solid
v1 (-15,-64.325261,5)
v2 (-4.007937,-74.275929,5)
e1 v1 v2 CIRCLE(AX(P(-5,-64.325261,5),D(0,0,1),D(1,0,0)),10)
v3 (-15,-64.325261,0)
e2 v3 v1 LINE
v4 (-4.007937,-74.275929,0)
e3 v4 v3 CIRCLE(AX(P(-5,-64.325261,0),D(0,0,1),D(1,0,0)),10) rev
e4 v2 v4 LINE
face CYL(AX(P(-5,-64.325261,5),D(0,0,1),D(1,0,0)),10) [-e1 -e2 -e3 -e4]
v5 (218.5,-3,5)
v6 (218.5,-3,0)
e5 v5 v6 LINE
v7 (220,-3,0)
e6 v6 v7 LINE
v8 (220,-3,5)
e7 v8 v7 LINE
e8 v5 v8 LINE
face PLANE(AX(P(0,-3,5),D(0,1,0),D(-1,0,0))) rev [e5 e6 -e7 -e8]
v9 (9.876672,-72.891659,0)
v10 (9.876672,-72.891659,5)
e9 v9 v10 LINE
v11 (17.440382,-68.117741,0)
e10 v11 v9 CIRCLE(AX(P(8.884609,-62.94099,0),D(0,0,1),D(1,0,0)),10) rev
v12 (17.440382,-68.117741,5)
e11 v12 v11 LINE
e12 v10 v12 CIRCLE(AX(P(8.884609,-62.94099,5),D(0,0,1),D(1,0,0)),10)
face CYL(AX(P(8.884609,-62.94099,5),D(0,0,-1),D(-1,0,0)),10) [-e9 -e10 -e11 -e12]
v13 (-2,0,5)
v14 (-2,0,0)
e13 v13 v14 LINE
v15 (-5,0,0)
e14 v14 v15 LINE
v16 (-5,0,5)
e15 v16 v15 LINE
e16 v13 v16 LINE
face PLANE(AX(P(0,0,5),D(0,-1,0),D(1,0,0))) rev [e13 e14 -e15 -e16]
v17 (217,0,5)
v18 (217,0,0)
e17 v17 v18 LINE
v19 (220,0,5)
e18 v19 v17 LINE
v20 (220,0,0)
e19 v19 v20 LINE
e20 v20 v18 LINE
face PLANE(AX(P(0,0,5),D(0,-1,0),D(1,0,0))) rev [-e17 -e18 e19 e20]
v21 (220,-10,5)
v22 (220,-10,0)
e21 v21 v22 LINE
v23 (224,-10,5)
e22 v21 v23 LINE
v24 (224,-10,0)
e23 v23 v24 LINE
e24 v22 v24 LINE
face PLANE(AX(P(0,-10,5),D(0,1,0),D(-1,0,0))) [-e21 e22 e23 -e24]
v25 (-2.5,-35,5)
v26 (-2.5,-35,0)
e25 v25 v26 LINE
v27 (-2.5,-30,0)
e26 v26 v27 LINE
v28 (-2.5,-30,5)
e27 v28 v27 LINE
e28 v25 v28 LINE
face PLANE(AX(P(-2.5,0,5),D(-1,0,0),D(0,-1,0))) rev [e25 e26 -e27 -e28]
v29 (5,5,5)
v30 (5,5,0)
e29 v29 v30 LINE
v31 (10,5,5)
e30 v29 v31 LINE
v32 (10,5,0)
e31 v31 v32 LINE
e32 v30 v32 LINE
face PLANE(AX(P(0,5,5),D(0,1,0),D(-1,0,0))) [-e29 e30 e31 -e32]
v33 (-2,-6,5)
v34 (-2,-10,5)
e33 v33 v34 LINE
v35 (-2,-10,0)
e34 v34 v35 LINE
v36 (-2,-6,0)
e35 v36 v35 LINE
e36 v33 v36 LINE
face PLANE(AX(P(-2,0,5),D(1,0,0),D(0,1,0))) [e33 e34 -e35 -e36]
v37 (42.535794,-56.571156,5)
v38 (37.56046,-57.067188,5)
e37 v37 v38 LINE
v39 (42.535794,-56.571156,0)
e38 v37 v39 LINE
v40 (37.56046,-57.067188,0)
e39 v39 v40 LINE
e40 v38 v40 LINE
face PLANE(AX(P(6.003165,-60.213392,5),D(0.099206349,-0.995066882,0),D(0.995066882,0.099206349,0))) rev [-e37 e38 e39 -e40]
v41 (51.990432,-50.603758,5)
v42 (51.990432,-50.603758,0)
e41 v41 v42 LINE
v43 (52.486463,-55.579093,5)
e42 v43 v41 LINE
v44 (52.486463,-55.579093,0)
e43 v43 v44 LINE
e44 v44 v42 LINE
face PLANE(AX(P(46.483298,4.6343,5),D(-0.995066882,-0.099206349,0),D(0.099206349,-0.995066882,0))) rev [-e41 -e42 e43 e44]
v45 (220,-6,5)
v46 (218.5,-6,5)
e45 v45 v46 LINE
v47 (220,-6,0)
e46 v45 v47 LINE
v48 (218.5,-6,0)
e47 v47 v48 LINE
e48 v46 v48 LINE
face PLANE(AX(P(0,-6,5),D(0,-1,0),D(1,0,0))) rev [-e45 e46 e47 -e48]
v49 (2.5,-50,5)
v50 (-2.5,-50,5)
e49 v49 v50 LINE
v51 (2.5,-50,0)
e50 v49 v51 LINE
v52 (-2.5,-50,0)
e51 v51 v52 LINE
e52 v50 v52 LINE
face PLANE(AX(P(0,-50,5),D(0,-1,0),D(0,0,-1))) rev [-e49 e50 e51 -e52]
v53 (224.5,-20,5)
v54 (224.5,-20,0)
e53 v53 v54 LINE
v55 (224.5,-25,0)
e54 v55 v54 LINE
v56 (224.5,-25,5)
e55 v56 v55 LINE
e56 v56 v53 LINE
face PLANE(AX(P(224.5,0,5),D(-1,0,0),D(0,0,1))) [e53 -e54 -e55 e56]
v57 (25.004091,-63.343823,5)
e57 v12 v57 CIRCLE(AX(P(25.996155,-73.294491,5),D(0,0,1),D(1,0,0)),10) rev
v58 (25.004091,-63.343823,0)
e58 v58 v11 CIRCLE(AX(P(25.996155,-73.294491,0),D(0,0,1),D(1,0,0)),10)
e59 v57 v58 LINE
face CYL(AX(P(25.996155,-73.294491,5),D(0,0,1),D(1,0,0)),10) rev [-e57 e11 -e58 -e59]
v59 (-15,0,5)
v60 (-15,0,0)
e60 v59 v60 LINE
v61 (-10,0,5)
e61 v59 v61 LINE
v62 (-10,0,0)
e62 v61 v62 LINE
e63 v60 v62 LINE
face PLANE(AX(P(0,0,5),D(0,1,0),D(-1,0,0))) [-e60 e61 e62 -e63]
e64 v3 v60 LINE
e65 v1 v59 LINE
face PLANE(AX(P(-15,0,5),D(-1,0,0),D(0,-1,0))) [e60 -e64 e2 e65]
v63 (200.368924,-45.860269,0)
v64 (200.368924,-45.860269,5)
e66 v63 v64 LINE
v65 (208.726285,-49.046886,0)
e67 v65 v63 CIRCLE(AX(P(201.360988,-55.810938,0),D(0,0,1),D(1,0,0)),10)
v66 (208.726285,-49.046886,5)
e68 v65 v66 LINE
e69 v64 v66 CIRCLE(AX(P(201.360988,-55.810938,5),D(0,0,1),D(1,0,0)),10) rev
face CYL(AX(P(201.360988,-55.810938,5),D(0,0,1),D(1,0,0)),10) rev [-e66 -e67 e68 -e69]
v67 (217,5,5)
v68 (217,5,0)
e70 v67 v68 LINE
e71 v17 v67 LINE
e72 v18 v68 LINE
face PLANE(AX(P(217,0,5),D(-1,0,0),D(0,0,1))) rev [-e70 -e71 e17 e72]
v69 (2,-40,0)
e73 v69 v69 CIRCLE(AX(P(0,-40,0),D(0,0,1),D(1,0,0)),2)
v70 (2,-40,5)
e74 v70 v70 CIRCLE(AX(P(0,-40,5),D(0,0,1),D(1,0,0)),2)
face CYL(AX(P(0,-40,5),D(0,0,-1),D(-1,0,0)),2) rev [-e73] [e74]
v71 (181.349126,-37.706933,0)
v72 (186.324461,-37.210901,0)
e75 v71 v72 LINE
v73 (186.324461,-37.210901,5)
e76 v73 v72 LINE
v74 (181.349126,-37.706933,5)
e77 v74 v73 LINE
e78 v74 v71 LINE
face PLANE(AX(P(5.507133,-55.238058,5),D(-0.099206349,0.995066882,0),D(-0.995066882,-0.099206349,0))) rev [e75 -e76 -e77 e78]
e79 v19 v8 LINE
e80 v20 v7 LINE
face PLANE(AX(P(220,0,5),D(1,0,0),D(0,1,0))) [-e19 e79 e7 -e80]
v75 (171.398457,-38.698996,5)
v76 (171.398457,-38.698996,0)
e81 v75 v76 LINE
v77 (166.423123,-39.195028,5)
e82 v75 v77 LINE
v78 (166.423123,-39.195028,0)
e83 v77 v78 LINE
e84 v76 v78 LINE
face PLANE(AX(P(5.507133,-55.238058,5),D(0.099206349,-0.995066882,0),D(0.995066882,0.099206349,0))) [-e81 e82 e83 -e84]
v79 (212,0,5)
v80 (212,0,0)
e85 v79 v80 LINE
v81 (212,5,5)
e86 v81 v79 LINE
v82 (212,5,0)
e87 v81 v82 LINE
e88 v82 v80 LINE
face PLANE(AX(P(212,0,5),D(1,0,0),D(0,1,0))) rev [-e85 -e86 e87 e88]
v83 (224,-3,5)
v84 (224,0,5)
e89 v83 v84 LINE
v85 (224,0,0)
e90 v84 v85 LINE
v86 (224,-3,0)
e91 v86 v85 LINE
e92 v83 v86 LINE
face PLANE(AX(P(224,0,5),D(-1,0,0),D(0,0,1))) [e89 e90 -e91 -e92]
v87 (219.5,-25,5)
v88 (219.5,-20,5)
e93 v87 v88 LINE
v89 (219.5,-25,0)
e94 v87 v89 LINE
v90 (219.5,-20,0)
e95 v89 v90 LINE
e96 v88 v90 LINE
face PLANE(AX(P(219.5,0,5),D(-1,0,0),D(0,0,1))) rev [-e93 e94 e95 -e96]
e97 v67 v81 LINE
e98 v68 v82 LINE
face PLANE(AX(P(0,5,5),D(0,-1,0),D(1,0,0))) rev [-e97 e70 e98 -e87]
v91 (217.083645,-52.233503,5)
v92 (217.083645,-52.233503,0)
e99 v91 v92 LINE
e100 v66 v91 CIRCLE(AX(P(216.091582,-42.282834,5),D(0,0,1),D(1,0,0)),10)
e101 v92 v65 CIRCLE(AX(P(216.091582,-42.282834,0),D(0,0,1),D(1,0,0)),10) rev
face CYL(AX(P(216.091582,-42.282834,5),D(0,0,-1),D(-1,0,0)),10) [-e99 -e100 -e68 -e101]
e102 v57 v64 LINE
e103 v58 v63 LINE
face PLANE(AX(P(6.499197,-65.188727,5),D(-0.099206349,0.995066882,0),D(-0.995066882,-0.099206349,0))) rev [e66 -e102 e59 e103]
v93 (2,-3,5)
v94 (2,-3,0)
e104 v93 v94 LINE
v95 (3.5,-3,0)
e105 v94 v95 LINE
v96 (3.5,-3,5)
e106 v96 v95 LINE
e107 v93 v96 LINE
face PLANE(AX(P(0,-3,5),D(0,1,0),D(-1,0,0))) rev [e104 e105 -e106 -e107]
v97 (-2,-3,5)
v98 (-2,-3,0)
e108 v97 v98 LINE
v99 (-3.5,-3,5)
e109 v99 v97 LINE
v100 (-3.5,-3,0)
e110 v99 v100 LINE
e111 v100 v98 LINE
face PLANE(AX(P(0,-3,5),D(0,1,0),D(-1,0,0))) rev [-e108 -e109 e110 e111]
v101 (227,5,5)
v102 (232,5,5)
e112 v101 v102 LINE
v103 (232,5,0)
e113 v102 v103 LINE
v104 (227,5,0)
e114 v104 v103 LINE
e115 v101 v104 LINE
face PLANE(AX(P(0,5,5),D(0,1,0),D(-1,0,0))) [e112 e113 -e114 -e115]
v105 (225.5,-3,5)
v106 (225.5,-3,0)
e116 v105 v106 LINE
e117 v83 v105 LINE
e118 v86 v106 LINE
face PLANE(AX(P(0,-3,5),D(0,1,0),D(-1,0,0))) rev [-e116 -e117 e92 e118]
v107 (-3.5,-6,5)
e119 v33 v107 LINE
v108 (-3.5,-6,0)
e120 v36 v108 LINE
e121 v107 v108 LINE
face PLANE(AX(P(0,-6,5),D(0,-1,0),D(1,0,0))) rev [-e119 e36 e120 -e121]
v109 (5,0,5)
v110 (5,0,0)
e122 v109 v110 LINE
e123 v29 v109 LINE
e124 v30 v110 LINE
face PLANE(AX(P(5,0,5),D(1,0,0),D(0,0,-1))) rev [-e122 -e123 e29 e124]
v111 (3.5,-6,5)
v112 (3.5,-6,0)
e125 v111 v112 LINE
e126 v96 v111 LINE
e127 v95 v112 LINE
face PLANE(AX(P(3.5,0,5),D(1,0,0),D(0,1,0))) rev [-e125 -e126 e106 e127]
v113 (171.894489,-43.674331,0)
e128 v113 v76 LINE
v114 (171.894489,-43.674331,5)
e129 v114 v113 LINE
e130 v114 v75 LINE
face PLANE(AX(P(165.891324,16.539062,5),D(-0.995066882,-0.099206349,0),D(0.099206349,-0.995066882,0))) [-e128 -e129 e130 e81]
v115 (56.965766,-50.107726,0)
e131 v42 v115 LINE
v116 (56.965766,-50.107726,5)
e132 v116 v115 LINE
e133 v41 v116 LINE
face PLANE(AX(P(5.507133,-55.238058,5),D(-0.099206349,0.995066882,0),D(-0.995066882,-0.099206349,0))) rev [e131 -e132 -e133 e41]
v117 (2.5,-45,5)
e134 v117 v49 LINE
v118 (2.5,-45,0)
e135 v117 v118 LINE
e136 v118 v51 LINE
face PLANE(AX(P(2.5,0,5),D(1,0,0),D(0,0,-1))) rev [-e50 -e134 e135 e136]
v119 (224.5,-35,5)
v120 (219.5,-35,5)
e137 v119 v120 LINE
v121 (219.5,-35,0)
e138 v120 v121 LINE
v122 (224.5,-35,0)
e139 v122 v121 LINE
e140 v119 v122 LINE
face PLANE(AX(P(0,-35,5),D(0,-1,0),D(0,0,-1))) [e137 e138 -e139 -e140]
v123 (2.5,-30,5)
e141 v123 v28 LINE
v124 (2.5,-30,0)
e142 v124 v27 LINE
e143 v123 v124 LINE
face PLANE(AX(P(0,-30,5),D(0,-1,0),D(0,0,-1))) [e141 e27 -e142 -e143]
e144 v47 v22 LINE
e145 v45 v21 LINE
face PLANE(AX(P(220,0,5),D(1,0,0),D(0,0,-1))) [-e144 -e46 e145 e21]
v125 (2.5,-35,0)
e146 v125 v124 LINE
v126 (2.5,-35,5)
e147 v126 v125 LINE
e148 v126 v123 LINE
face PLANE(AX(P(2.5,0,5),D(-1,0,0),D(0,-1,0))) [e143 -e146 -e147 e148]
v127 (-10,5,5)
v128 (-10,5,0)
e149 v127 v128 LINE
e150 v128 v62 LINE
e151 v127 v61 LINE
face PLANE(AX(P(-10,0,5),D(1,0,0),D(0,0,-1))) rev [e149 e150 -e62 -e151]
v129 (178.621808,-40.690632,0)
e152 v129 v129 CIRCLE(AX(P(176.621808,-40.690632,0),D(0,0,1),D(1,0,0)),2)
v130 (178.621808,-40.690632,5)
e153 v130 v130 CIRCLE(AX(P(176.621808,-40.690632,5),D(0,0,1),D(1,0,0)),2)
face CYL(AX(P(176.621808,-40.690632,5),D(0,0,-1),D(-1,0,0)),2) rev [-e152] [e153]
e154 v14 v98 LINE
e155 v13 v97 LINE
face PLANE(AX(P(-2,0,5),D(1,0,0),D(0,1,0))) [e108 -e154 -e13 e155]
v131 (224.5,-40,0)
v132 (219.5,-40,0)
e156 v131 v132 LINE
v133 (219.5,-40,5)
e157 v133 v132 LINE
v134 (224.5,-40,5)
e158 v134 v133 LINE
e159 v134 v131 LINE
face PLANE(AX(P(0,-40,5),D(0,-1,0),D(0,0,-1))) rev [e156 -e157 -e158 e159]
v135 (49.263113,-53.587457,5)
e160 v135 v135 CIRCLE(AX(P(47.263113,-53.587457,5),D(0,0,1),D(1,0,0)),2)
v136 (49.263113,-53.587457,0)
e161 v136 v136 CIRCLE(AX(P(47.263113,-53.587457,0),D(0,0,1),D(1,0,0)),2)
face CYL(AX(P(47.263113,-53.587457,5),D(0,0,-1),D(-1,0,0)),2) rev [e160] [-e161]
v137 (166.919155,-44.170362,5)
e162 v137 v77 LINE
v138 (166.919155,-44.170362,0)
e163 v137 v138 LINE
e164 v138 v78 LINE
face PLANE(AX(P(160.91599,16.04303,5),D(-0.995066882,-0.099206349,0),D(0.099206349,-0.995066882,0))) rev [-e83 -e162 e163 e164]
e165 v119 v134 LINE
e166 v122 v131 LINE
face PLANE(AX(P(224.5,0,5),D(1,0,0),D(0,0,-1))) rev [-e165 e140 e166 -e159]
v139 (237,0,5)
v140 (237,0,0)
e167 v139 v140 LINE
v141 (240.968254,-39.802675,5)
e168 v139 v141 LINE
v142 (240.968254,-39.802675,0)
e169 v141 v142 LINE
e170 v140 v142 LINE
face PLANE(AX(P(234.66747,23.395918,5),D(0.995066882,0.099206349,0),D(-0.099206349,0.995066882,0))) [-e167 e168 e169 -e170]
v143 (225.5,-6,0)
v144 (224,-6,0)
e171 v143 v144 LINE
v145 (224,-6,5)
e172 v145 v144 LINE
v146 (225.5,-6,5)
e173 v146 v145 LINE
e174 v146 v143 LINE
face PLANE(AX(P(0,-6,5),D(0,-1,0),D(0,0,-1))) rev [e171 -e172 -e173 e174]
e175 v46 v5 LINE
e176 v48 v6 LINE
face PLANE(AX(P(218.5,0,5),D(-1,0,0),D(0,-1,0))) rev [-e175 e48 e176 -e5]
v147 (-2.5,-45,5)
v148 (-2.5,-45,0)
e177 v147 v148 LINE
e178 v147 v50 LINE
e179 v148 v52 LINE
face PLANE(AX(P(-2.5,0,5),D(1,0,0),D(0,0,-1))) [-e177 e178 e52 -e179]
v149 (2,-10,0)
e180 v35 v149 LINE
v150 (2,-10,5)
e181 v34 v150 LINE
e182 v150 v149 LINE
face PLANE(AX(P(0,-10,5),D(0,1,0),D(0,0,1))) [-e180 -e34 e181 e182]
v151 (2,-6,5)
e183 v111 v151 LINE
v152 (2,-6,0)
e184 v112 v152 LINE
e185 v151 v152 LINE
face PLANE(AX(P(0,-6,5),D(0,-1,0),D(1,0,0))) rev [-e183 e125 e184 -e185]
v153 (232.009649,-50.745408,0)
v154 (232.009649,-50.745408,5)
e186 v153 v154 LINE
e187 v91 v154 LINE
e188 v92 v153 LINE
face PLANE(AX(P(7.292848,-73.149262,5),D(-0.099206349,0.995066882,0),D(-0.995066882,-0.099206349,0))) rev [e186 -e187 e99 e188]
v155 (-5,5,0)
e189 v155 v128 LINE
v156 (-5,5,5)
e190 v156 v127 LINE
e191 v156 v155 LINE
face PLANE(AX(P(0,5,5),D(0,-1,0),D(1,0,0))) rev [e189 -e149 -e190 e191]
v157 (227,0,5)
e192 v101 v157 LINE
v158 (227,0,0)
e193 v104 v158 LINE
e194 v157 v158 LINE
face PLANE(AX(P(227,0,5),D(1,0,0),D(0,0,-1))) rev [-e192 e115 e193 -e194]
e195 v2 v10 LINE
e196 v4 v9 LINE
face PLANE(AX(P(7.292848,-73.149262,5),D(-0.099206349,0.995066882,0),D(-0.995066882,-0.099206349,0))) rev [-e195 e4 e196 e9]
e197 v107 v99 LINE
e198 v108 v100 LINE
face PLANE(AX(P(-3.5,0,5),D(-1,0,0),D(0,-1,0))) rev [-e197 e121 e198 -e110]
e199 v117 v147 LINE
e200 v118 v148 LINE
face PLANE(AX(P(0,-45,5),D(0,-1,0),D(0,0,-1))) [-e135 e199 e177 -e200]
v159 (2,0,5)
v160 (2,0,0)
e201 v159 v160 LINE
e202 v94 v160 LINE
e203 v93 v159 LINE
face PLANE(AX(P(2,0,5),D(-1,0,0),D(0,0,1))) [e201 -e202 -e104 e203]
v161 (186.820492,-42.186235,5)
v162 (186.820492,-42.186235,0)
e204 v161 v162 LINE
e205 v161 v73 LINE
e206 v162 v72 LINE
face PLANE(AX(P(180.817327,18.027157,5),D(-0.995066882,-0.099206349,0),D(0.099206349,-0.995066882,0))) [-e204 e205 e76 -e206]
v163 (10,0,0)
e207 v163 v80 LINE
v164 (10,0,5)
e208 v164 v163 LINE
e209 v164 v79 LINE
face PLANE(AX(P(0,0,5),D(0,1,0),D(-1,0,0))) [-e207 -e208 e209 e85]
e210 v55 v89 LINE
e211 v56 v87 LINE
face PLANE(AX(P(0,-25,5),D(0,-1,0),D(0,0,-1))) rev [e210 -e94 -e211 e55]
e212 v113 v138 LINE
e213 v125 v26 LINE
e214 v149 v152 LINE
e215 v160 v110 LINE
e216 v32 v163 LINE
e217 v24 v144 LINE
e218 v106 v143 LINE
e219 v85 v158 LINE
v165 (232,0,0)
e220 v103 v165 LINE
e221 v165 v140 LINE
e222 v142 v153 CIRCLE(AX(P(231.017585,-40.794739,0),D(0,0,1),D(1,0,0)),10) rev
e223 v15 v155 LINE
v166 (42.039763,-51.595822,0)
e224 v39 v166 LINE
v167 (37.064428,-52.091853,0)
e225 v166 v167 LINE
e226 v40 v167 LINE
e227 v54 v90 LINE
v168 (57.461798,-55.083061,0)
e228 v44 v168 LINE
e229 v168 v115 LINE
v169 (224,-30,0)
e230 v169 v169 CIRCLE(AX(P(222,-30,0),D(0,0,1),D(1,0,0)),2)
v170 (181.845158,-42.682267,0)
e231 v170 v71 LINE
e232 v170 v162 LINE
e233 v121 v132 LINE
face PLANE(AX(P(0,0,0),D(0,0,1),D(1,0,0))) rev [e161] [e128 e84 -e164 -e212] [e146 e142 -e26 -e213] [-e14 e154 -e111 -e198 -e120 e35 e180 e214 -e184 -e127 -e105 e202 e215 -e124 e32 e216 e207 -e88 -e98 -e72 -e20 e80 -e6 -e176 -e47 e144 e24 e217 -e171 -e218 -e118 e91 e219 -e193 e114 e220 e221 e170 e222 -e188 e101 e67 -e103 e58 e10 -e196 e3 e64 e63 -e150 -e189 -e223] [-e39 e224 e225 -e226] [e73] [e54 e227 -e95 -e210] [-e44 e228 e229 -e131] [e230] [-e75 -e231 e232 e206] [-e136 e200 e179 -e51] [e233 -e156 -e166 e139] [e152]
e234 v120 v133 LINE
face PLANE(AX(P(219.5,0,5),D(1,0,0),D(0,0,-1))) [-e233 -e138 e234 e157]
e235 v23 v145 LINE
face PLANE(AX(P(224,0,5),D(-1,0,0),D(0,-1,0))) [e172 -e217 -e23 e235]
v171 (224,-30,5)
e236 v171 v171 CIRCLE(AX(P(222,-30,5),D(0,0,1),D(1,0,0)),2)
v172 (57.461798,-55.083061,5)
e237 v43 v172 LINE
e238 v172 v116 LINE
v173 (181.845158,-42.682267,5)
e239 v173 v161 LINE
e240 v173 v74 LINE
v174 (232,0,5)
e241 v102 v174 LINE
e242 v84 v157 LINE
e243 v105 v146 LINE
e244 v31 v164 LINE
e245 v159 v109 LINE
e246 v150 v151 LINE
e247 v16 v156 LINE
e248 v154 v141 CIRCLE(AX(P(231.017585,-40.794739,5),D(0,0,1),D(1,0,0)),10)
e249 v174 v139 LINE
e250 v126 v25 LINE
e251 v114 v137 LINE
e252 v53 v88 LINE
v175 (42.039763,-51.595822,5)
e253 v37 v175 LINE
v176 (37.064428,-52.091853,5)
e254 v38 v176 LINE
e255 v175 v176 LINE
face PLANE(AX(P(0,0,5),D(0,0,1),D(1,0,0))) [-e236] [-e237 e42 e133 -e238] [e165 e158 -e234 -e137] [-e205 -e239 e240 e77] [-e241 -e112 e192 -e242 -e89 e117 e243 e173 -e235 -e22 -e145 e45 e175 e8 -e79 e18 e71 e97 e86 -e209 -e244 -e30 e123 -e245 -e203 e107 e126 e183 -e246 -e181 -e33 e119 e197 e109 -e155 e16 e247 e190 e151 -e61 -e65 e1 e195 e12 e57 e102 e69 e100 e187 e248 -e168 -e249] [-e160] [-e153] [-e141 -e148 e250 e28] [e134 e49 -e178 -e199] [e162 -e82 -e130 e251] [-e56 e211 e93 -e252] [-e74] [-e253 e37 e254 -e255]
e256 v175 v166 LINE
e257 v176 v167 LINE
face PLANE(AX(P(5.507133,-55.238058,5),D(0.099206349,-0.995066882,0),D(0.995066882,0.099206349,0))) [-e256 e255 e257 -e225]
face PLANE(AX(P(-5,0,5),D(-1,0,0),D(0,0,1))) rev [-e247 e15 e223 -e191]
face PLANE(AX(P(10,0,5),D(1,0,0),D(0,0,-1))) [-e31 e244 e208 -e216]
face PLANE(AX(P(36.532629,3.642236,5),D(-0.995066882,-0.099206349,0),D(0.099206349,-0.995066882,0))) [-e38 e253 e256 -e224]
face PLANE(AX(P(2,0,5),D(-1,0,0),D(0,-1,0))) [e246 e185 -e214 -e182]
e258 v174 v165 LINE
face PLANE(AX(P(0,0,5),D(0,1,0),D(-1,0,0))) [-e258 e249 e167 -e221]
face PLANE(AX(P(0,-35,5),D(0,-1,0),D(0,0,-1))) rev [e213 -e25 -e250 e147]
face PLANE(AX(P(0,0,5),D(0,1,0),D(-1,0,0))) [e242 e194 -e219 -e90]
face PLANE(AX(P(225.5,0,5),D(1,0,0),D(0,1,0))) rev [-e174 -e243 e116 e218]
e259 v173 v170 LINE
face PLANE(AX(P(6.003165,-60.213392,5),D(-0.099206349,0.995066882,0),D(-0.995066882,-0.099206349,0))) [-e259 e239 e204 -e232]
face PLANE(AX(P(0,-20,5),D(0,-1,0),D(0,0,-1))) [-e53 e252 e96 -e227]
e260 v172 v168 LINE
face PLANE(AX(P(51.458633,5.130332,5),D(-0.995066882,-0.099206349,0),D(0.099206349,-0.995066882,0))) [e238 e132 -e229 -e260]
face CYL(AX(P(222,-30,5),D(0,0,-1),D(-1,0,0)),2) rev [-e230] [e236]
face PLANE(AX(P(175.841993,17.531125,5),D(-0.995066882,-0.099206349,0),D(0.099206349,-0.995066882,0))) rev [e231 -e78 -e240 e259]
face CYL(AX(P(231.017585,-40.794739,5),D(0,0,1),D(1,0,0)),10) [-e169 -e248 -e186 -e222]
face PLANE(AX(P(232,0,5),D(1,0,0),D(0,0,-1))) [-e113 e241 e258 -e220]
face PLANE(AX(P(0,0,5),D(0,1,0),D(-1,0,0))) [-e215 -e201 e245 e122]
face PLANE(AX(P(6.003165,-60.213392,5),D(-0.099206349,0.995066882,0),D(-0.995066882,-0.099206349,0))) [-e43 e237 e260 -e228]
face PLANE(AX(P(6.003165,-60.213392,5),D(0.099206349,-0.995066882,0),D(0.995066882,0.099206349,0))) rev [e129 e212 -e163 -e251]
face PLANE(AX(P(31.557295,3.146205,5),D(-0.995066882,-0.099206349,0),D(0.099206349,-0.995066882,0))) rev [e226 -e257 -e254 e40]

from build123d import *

# Parameters (mm, degrees)
ESQUISSE1_W        = 5
ESQUISSE1_H        = 5
ESQUISSE1_R        = 2
BOSS_EXTRU_1_DEPTH = 5
CONG_1_R           = 10


with BuildPart() as part:
    # Esquisse1 → Boss.-Extru.1 (new body)
    with BuildSketch(Plane.XY):
        Polygon((15, 0), (10, 0), (10, 5), (5, 5), (5, 0), (2, 0), (2, -3), (3.5, -3), (3.5, -6), (2, -6), (2, -10), (-2, -10), (-2, -6), (-3.5, -6), (-3.5, -3), (-2, -3), (-2, 0), (-5, 0), (-5, 5), (-10, 5), (-10, 0), (-15, 0), (-15, -75.371818049), (14.852006469, -72.395627572), (20.02875697, -63.839854419), (205.344258903, -45.364237629), (212.108310991, -52.729534592), (241.96031746, -49.753344116), (237, 0), (232, 0), (232, 5), (227, 5), (227, 0), (224, 0), (224, -3), (225.5, -3), (225.5, -6), (224, -6), (224, -10), (220, -10), (220, -6), (218.5, -6), (218.5, -3), (220, -3), (220, 0), (217, 0), (217, 5), (212, 5), (212, 0), (207, 0), align=None)
        with Locations((0, -47.5)):
            Rectangle(ESQUISSE1_W, ESQUISSE1_H, mode=Mode.SUBTRACT)
        Polygon((42.039762682, -51.595821645), (42.535794429, -56.571156057), (37.560460017, -57.067187803), (37.064428271, -52.091853391), align=None, mode=Mode.SUBTRACT)
        with Locations((47.263112967, -53.587457105)):
            Circle(ESQUISSE1_R, mode=Mode.SUBTRACT)
        with Locations((0, -40)):
            Circle(ESQUISSE1_R, mode=Mode.SUBTRACT)
        Polygon((57.461797663, -55.083060818), (52.486463252, -55.579092564), (51.990431506, -50.603758153), (56.965765917, -50.107726407), align=None, mode=Mode.SUBTRACT)
        Polygon((171.398457383, -38.698996248), (171.894489129, -43.67433066), (166.919154718, -44.170362406), (166.423122972, -39.195027994), align=None, mode=Mode.SUBTRACT)
        with Locations((176.621807668, -40.690631708)):
            Circle(ESQUISSE1_R, mode=Mode.SUBTRACT)
        Polygon((186.820492364, -42.186235422), (181.845157952, -42.682267168), (181.349126206, -37.706932756), (186.324460618, -37.21090101), align=None, mode=Mode.SUBTRACT)
        with Locations((222, -37.5)):
            Rectangle(ESQUISSE1_W, ESQUISSE1_H, mode=Mode.SUBTRACT)
        with Locations((0, -32.5)):
            Rectangle(ESQUISSE1_W, ESQUISSE1_H, mode=Mode.SUBTRACT)
        with Locations((222, -30)):
            Circle(ESQUISSE1_R, mode=Mode.SUBTRACT)
        with Locations((222, -22.5)):
            Rectangle(ESQUISSE1_W, ESQUISSE1_H, mode=Mode.SUBTRACT)
    extrude(amount=BOSS_EXTRU_1_DEPTH)

    # Congé1
    cong_1_edges = [part.edges().sort_by_distance(p)[0] for p in [
        (241.96031746, -49.753344116, 2.5),
        (205.344258903, -45.364237629, 2.5),
        (212.108310991, -52.729534592, 2.5),
        (-15, -75.371818049, 2.5),
        (20.02875697, -63.839854419, 2.5),
        (14.852006469, -72.395627572, 2.5),
    ]]
    fillet(cong_1_edges, radius=CONG_1_R - 0.0001)  # a hair under: the kernel refuses the full size


solid = part.part
